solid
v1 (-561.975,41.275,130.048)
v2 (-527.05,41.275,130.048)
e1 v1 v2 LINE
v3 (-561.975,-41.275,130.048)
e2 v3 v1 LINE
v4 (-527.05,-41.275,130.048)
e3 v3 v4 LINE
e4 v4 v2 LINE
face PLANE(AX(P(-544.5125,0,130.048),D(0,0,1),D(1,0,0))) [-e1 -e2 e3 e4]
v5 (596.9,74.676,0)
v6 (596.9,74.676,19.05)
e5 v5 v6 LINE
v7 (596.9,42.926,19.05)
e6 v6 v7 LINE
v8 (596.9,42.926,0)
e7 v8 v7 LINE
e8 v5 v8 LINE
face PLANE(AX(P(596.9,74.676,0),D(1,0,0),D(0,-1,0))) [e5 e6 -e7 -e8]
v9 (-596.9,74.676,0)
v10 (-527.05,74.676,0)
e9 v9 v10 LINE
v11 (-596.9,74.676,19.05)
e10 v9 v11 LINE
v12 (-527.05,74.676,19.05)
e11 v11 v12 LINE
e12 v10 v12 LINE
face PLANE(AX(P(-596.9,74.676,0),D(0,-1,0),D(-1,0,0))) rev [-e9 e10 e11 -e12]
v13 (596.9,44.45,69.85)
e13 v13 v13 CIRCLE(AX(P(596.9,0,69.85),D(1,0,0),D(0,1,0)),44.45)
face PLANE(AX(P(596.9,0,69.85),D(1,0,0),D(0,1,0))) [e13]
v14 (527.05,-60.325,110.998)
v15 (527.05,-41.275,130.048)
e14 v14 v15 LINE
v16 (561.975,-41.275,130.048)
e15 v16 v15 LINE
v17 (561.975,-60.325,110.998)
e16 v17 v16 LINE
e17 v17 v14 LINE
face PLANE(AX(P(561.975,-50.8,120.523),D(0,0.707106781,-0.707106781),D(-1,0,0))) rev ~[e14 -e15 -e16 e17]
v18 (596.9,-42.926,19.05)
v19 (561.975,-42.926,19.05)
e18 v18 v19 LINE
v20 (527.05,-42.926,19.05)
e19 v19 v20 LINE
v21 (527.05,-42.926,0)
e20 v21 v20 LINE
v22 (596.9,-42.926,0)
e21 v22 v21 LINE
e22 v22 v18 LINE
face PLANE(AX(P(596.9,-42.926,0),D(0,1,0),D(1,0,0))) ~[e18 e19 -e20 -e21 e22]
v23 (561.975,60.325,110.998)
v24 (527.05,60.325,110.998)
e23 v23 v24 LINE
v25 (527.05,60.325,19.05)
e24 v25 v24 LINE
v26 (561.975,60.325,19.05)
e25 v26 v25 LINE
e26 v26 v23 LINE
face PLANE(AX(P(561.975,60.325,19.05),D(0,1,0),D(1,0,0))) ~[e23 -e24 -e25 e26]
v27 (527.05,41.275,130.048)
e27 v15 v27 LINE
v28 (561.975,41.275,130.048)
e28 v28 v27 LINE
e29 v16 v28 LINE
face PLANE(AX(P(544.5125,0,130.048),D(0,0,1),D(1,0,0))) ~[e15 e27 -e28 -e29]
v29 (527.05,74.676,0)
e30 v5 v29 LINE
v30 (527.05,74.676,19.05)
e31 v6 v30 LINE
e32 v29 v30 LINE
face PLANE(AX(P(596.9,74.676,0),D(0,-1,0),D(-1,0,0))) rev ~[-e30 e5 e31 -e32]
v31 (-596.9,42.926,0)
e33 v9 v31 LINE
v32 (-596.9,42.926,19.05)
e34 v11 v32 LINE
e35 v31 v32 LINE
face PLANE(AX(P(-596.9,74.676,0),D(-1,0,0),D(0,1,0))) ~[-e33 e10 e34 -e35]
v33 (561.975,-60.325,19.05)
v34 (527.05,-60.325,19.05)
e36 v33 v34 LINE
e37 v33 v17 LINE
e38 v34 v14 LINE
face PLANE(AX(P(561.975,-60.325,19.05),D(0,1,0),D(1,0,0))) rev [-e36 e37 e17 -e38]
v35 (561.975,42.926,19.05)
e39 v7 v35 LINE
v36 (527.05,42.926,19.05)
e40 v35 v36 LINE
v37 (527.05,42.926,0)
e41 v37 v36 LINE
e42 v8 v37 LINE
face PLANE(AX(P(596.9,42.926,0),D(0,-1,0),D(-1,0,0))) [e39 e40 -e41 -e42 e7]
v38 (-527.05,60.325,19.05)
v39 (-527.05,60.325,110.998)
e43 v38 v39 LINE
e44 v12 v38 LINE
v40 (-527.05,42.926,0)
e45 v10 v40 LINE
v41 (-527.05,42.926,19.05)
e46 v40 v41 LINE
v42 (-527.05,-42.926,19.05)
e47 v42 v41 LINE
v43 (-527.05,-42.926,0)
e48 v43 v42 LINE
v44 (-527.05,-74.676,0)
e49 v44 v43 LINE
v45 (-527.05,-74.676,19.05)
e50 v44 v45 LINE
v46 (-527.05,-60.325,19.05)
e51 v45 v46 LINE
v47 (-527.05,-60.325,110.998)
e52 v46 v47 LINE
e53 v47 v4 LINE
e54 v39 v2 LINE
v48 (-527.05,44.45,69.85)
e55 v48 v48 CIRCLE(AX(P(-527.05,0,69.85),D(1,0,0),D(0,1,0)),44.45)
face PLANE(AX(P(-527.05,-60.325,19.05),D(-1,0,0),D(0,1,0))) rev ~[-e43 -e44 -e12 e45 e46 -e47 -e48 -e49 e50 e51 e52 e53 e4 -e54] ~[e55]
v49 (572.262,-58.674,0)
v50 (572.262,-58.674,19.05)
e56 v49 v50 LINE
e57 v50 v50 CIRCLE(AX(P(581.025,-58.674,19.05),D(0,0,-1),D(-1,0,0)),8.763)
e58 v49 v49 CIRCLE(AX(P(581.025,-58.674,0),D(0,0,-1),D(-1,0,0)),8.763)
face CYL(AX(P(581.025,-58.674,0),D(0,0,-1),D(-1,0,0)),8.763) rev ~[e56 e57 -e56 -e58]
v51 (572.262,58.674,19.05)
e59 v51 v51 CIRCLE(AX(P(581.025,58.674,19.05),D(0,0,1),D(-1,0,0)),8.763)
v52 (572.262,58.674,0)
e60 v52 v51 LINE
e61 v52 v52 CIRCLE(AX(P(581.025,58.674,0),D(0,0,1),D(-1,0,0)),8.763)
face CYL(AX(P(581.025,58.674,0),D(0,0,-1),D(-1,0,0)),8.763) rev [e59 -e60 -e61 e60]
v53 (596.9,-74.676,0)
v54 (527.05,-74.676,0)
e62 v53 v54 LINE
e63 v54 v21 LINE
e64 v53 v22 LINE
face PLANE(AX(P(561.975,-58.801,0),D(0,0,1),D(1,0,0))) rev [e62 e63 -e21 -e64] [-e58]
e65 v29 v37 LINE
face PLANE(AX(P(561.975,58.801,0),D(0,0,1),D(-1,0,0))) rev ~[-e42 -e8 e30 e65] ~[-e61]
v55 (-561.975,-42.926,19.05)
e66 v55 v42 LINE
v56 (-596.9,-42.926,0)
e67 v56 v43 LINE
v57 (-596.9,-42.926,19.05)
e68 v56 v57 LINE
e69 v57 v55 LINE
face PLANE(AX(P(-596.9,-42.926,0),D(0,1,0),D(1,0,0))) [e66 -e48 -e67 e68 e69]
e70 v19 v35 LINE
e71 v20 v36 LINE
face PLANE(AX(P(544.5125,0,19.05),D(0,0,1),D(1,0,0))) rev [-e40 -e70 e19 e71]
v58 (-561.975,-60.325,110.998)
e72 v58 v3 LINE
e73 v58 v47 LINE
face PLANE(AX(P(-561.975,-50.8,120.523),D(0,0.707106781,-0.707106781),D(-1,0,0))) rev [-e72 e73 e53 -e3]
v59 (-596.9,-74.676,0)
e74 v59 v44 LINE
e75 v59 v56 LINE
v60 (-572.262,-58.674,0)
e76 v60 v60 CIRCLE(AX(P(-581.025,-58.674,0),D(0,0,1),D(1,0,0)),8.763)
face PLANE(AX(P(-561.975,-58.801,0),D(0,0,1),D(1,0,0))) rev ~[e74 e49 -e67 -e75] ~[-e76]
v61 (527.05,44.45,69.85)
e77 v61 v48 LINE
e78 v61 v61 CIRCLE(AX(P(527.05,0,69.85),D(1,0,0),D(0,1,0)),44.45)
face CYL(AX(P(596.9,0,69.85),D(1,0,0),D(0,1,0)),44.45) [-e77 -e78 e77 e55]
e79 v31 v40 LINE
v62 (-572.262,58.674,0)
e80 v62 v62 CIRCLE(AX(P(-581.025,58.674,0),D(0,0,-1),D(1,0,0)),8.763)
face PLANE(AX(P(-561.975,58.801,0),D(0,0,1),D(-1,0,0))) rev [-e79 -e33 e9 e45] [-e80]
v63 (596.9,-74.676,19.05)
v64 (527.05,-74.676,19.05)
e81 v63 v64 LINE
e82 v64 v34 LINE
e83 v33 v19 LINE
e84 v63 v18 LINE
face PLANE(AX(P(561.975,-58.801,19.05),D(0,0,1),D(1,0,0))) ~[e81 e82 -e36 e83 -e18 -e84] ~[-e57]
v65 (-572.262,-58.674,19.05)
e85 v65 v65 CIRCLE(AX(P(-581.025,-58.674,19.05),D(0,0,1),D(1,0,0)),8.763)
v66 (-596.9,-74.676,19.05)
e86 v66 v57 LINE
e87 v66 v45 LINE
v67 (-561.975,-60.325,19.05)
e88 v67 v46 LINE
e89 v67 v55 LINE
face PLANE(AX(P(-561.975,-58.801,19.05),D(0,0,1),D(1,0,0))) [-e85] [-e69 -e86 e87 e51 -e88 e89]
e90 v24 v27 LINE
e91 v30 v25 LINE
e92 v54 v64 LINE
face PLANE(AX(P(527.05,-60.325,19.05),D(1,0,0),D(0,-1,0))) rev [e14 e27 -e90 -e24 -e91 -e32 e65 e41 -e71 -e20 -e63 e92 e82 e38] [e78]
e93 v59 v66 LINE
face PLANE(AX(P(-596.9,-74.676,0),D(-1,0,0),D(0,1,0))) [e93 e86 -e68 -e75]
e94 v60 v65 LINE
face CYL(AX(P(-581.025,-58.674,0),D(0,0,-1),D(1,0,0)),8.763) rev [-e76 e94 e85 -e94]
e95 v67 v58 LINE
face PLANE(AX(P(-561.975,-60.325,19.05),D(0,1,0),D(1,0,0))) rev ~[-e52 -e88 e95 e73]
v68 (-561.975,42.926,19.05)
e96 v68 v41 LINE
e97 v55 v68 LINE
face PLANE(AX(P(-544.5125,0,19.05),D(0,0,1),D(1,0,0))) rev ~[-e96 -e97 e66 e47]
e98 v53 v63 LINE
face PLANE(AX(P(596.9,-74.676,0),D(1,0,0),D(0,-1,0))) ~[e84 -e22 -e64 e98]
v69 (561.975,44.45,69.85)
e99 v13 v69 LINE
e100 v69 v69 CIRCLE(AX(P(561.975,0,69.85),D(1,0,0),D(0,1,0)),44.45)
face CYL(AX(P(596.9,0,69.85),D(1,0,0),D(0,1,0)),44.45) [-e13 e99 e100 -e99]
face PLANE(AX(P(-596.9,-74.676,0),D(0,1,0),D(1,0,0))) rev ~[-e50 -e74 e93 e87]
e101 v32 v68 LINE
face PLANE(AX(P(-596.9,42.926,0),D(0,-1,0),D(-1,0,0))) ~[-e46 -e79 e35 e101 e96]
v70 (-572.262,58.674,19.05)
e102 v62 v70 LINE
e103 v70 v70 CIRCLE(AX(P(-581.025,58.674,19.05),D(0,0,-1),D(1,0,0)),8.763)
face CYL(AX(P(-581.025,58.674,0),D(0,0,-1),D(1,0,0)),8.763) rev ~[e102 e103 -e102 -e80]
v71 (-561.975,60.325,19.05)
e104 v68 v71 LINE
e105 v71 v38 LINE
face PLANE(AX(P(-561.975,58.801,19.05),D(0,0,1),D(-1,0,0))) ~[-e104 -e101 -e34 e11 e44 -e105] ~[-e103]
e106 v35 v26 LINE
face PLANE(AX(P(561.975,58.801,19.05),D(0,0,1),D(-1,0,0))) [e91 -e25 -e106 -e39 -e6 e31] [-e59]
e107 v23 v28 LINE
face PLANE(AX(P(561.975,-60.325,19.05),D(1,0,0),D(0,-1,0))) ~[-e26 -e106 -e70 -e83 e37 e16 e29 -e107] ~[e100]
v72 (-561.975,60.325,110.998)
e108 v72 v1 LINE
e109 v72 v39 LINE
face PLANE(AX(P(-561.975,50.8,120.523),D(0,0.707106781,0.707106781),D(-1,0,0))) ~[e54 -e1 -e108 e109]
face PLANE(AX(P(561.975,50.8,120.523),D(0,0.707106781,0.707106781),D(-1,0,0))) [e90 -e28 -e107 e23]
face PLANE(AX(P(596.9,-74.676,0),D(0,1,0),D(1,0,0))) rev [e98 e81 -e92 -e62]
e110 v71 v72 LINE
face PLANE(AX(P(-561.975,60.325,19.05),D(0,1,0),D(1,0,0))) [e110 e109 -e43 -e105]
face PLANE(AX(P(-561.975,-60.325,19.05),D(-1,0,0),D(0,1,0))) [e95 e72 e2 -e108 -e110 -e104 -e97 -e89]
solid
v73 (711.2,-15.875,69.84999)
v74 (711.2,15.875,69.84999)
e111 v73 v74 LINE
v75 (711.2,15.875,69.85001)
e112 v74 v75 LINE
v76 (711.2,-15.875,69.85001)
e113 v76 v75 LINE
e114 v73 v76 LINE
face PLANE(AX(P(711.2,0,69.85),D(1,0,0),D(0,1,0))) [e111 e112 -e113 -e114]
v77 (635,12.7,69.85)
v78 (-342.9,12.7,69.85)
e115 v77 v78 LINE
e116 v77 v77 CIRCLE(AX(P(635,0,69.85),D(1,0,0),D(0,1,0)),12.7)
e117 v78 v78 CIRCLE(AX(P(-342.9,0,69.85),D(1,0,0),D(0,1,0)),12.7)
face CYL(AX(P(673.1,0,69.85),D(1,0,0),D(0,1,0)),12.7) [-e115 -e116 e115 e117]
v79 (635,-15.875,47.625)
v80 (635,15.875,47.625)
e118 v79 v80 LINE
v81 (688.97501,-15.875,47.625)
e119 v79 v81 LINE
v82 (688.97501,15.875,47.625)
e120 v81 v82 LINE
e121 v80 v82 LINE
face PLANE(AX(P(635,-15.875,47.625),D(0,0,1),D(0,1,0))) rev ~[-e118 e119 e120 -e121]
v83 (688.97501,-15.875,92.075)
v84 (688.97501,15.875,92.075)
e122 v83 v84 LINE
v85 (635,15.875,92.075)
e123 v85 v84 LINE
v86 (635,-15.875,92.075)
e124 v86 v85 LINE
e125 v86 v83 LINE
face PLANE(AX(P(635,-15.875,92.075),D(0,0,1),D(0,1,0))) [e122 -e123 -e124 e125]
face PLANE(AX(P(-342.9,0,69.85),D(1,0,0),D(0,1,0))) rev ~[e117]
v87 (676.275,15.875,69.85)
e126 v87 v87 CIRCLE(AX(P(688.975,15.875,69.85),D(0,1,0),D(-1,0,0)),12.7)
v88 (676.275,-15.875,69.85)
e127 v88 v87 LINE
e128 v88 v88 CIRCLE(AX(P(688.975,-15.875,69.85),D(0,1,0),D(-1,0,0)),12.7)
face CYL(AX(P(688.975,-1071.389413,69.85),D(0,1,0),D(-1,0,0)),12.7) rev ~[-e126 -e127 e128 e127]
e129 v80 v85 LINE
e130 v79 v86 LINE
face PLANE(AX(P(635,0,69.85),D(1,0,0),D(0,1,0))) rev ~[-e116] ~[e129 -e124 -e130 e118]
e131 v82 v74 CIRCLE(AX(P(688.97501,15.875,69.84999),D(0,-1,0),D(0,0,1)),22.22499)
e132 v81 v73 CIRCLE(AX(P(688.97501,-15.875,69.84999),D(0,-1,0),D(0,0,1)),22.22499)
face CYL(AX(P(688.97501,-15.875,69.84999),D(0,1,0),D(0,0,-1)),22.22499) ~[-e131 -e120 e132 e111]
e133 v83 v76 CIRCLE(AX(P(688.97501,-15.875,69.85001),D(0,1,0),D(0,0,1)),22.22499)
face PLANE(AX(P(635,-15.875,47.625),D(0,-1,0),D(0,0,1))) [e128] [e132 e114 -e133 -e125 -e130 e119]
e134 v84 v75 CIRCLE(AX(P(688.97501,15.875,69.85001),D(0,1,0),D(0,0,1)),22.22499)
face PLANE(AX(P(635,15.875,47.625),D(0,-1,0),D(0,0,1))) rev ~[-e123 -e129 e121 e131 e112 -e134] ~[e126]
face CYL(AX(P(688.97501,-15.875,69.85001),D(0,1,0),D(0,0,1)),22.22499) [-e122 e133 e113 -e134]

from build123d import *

# Parameters (mm, degrees)
F0_W      = 69.85
F0_H      = 31.75
F0_R      = 8.763
F1_DEPTH  = 19.05
F3_W      = 34.925
F3_H      = 120.65
F4_DEPTH  = 110.998
F5_SIZE   = 19.05
F8_R      = 44.45
F9_DEPTH  = 1123.95
F11_R     = 12.7
F12_DEPTH = 1016
F14_W     = 31.75
F14_H     = 44.45
F15_DEPTH = 76.2
F16_R     = 22.22499
F18_D     = 25.4


# Not quite as in the source:
# - a fillet or chamfer is up to 0.001 mm smaller than in the source, because OpenCascade refuses the exact size


with BuildPart() as f1:
    # F0 (on Top) → F1 (new body)
    with BuildSketch(Plane.XY):
        with Locations((-561.975, -58.801)):
            Rectangle(F0_W, F0_H)
        with Locations((-581.025, -58.674)):
            Circle(F0_R, mode=Mode.SUBTRACT)
    extrude(amount=F1_DEPTH)


with BuildPart() as f2_1:
    # F2: instance of F1
    add(f1.part.mirror(Plane.XZ))


with BuildPart() as f1_1:
    add(f1.part)

    add(f2_1.part)  # F4 merges F2_1
    # F3 (on face) → F4 (join)
    with BuildSketch(Plane.XY.offset(19.05)):
        with Locations((-544.5125, 0)):
            Rectangle(F3_W, F3_H)
    extrude(amount=F4_DEPTH)

    # F5
    f5_edges = [f1_1.edges().sort_by_distance(p)[0] for p in [
        (-544.5125, 60.325, 130.048),
        (-544.5125, -60.325, 130.048),
    ]]
    chamfer(f5_edges, length=F5_SIZE)

    # F6: union 


with BuildPart() as f7_1:
    # F7: instance of F1
    add(f1_1.part.mirror(Plane.YZ))


with BuildPart() as f1_2:
    add(f1_1.part)

    add(f7_1.part)  # F9 merges F7_1
    # F8 (on face) → F9 (join, through all)
    with BuildSketch(Plane.YZ.offset(596.9)):
        with Locations((0, 69.85)):
            Circle(F8_R)
    extrude(amount=-F9_DEPTH)


with BuildPart() as f12:
    # F11 (on offset) → F12 (new body)
    with BuildSketch(Plane.YZ.offset(673.1)):
        with Locations((0, 69.85)):
            Circle(F11_R)
    extrude(amount=-F12_DEPTH)

    # F14 (on offset) → F15 (join)
    with BuildSketch(Plane.YZ.offset(635)):
        with Locations((0, 69.85)):
            Rectangle(F14_W, F14_H)
    extrude(amount=F15_DEPTH)

    # F16 (radius 22.225 in the source; OpenCascade refuses exactly that, so slightly less here)
    f16_edges = [f12.edges().sort_by_distance(p)[0] for p in [
        (711.2, 0, 92.075),
        (711.2, 0, 47.625),
    ]]
    fillet(f16_edges, radius=F16_R)

    # F18 (through all)
    with Locations(Plane.XZ.offset(15.875)):
        with Locations((688.975, 69.85)):
            Hole(F18_D / 2)


solid = Compound([f1_2.part, f12.part])
